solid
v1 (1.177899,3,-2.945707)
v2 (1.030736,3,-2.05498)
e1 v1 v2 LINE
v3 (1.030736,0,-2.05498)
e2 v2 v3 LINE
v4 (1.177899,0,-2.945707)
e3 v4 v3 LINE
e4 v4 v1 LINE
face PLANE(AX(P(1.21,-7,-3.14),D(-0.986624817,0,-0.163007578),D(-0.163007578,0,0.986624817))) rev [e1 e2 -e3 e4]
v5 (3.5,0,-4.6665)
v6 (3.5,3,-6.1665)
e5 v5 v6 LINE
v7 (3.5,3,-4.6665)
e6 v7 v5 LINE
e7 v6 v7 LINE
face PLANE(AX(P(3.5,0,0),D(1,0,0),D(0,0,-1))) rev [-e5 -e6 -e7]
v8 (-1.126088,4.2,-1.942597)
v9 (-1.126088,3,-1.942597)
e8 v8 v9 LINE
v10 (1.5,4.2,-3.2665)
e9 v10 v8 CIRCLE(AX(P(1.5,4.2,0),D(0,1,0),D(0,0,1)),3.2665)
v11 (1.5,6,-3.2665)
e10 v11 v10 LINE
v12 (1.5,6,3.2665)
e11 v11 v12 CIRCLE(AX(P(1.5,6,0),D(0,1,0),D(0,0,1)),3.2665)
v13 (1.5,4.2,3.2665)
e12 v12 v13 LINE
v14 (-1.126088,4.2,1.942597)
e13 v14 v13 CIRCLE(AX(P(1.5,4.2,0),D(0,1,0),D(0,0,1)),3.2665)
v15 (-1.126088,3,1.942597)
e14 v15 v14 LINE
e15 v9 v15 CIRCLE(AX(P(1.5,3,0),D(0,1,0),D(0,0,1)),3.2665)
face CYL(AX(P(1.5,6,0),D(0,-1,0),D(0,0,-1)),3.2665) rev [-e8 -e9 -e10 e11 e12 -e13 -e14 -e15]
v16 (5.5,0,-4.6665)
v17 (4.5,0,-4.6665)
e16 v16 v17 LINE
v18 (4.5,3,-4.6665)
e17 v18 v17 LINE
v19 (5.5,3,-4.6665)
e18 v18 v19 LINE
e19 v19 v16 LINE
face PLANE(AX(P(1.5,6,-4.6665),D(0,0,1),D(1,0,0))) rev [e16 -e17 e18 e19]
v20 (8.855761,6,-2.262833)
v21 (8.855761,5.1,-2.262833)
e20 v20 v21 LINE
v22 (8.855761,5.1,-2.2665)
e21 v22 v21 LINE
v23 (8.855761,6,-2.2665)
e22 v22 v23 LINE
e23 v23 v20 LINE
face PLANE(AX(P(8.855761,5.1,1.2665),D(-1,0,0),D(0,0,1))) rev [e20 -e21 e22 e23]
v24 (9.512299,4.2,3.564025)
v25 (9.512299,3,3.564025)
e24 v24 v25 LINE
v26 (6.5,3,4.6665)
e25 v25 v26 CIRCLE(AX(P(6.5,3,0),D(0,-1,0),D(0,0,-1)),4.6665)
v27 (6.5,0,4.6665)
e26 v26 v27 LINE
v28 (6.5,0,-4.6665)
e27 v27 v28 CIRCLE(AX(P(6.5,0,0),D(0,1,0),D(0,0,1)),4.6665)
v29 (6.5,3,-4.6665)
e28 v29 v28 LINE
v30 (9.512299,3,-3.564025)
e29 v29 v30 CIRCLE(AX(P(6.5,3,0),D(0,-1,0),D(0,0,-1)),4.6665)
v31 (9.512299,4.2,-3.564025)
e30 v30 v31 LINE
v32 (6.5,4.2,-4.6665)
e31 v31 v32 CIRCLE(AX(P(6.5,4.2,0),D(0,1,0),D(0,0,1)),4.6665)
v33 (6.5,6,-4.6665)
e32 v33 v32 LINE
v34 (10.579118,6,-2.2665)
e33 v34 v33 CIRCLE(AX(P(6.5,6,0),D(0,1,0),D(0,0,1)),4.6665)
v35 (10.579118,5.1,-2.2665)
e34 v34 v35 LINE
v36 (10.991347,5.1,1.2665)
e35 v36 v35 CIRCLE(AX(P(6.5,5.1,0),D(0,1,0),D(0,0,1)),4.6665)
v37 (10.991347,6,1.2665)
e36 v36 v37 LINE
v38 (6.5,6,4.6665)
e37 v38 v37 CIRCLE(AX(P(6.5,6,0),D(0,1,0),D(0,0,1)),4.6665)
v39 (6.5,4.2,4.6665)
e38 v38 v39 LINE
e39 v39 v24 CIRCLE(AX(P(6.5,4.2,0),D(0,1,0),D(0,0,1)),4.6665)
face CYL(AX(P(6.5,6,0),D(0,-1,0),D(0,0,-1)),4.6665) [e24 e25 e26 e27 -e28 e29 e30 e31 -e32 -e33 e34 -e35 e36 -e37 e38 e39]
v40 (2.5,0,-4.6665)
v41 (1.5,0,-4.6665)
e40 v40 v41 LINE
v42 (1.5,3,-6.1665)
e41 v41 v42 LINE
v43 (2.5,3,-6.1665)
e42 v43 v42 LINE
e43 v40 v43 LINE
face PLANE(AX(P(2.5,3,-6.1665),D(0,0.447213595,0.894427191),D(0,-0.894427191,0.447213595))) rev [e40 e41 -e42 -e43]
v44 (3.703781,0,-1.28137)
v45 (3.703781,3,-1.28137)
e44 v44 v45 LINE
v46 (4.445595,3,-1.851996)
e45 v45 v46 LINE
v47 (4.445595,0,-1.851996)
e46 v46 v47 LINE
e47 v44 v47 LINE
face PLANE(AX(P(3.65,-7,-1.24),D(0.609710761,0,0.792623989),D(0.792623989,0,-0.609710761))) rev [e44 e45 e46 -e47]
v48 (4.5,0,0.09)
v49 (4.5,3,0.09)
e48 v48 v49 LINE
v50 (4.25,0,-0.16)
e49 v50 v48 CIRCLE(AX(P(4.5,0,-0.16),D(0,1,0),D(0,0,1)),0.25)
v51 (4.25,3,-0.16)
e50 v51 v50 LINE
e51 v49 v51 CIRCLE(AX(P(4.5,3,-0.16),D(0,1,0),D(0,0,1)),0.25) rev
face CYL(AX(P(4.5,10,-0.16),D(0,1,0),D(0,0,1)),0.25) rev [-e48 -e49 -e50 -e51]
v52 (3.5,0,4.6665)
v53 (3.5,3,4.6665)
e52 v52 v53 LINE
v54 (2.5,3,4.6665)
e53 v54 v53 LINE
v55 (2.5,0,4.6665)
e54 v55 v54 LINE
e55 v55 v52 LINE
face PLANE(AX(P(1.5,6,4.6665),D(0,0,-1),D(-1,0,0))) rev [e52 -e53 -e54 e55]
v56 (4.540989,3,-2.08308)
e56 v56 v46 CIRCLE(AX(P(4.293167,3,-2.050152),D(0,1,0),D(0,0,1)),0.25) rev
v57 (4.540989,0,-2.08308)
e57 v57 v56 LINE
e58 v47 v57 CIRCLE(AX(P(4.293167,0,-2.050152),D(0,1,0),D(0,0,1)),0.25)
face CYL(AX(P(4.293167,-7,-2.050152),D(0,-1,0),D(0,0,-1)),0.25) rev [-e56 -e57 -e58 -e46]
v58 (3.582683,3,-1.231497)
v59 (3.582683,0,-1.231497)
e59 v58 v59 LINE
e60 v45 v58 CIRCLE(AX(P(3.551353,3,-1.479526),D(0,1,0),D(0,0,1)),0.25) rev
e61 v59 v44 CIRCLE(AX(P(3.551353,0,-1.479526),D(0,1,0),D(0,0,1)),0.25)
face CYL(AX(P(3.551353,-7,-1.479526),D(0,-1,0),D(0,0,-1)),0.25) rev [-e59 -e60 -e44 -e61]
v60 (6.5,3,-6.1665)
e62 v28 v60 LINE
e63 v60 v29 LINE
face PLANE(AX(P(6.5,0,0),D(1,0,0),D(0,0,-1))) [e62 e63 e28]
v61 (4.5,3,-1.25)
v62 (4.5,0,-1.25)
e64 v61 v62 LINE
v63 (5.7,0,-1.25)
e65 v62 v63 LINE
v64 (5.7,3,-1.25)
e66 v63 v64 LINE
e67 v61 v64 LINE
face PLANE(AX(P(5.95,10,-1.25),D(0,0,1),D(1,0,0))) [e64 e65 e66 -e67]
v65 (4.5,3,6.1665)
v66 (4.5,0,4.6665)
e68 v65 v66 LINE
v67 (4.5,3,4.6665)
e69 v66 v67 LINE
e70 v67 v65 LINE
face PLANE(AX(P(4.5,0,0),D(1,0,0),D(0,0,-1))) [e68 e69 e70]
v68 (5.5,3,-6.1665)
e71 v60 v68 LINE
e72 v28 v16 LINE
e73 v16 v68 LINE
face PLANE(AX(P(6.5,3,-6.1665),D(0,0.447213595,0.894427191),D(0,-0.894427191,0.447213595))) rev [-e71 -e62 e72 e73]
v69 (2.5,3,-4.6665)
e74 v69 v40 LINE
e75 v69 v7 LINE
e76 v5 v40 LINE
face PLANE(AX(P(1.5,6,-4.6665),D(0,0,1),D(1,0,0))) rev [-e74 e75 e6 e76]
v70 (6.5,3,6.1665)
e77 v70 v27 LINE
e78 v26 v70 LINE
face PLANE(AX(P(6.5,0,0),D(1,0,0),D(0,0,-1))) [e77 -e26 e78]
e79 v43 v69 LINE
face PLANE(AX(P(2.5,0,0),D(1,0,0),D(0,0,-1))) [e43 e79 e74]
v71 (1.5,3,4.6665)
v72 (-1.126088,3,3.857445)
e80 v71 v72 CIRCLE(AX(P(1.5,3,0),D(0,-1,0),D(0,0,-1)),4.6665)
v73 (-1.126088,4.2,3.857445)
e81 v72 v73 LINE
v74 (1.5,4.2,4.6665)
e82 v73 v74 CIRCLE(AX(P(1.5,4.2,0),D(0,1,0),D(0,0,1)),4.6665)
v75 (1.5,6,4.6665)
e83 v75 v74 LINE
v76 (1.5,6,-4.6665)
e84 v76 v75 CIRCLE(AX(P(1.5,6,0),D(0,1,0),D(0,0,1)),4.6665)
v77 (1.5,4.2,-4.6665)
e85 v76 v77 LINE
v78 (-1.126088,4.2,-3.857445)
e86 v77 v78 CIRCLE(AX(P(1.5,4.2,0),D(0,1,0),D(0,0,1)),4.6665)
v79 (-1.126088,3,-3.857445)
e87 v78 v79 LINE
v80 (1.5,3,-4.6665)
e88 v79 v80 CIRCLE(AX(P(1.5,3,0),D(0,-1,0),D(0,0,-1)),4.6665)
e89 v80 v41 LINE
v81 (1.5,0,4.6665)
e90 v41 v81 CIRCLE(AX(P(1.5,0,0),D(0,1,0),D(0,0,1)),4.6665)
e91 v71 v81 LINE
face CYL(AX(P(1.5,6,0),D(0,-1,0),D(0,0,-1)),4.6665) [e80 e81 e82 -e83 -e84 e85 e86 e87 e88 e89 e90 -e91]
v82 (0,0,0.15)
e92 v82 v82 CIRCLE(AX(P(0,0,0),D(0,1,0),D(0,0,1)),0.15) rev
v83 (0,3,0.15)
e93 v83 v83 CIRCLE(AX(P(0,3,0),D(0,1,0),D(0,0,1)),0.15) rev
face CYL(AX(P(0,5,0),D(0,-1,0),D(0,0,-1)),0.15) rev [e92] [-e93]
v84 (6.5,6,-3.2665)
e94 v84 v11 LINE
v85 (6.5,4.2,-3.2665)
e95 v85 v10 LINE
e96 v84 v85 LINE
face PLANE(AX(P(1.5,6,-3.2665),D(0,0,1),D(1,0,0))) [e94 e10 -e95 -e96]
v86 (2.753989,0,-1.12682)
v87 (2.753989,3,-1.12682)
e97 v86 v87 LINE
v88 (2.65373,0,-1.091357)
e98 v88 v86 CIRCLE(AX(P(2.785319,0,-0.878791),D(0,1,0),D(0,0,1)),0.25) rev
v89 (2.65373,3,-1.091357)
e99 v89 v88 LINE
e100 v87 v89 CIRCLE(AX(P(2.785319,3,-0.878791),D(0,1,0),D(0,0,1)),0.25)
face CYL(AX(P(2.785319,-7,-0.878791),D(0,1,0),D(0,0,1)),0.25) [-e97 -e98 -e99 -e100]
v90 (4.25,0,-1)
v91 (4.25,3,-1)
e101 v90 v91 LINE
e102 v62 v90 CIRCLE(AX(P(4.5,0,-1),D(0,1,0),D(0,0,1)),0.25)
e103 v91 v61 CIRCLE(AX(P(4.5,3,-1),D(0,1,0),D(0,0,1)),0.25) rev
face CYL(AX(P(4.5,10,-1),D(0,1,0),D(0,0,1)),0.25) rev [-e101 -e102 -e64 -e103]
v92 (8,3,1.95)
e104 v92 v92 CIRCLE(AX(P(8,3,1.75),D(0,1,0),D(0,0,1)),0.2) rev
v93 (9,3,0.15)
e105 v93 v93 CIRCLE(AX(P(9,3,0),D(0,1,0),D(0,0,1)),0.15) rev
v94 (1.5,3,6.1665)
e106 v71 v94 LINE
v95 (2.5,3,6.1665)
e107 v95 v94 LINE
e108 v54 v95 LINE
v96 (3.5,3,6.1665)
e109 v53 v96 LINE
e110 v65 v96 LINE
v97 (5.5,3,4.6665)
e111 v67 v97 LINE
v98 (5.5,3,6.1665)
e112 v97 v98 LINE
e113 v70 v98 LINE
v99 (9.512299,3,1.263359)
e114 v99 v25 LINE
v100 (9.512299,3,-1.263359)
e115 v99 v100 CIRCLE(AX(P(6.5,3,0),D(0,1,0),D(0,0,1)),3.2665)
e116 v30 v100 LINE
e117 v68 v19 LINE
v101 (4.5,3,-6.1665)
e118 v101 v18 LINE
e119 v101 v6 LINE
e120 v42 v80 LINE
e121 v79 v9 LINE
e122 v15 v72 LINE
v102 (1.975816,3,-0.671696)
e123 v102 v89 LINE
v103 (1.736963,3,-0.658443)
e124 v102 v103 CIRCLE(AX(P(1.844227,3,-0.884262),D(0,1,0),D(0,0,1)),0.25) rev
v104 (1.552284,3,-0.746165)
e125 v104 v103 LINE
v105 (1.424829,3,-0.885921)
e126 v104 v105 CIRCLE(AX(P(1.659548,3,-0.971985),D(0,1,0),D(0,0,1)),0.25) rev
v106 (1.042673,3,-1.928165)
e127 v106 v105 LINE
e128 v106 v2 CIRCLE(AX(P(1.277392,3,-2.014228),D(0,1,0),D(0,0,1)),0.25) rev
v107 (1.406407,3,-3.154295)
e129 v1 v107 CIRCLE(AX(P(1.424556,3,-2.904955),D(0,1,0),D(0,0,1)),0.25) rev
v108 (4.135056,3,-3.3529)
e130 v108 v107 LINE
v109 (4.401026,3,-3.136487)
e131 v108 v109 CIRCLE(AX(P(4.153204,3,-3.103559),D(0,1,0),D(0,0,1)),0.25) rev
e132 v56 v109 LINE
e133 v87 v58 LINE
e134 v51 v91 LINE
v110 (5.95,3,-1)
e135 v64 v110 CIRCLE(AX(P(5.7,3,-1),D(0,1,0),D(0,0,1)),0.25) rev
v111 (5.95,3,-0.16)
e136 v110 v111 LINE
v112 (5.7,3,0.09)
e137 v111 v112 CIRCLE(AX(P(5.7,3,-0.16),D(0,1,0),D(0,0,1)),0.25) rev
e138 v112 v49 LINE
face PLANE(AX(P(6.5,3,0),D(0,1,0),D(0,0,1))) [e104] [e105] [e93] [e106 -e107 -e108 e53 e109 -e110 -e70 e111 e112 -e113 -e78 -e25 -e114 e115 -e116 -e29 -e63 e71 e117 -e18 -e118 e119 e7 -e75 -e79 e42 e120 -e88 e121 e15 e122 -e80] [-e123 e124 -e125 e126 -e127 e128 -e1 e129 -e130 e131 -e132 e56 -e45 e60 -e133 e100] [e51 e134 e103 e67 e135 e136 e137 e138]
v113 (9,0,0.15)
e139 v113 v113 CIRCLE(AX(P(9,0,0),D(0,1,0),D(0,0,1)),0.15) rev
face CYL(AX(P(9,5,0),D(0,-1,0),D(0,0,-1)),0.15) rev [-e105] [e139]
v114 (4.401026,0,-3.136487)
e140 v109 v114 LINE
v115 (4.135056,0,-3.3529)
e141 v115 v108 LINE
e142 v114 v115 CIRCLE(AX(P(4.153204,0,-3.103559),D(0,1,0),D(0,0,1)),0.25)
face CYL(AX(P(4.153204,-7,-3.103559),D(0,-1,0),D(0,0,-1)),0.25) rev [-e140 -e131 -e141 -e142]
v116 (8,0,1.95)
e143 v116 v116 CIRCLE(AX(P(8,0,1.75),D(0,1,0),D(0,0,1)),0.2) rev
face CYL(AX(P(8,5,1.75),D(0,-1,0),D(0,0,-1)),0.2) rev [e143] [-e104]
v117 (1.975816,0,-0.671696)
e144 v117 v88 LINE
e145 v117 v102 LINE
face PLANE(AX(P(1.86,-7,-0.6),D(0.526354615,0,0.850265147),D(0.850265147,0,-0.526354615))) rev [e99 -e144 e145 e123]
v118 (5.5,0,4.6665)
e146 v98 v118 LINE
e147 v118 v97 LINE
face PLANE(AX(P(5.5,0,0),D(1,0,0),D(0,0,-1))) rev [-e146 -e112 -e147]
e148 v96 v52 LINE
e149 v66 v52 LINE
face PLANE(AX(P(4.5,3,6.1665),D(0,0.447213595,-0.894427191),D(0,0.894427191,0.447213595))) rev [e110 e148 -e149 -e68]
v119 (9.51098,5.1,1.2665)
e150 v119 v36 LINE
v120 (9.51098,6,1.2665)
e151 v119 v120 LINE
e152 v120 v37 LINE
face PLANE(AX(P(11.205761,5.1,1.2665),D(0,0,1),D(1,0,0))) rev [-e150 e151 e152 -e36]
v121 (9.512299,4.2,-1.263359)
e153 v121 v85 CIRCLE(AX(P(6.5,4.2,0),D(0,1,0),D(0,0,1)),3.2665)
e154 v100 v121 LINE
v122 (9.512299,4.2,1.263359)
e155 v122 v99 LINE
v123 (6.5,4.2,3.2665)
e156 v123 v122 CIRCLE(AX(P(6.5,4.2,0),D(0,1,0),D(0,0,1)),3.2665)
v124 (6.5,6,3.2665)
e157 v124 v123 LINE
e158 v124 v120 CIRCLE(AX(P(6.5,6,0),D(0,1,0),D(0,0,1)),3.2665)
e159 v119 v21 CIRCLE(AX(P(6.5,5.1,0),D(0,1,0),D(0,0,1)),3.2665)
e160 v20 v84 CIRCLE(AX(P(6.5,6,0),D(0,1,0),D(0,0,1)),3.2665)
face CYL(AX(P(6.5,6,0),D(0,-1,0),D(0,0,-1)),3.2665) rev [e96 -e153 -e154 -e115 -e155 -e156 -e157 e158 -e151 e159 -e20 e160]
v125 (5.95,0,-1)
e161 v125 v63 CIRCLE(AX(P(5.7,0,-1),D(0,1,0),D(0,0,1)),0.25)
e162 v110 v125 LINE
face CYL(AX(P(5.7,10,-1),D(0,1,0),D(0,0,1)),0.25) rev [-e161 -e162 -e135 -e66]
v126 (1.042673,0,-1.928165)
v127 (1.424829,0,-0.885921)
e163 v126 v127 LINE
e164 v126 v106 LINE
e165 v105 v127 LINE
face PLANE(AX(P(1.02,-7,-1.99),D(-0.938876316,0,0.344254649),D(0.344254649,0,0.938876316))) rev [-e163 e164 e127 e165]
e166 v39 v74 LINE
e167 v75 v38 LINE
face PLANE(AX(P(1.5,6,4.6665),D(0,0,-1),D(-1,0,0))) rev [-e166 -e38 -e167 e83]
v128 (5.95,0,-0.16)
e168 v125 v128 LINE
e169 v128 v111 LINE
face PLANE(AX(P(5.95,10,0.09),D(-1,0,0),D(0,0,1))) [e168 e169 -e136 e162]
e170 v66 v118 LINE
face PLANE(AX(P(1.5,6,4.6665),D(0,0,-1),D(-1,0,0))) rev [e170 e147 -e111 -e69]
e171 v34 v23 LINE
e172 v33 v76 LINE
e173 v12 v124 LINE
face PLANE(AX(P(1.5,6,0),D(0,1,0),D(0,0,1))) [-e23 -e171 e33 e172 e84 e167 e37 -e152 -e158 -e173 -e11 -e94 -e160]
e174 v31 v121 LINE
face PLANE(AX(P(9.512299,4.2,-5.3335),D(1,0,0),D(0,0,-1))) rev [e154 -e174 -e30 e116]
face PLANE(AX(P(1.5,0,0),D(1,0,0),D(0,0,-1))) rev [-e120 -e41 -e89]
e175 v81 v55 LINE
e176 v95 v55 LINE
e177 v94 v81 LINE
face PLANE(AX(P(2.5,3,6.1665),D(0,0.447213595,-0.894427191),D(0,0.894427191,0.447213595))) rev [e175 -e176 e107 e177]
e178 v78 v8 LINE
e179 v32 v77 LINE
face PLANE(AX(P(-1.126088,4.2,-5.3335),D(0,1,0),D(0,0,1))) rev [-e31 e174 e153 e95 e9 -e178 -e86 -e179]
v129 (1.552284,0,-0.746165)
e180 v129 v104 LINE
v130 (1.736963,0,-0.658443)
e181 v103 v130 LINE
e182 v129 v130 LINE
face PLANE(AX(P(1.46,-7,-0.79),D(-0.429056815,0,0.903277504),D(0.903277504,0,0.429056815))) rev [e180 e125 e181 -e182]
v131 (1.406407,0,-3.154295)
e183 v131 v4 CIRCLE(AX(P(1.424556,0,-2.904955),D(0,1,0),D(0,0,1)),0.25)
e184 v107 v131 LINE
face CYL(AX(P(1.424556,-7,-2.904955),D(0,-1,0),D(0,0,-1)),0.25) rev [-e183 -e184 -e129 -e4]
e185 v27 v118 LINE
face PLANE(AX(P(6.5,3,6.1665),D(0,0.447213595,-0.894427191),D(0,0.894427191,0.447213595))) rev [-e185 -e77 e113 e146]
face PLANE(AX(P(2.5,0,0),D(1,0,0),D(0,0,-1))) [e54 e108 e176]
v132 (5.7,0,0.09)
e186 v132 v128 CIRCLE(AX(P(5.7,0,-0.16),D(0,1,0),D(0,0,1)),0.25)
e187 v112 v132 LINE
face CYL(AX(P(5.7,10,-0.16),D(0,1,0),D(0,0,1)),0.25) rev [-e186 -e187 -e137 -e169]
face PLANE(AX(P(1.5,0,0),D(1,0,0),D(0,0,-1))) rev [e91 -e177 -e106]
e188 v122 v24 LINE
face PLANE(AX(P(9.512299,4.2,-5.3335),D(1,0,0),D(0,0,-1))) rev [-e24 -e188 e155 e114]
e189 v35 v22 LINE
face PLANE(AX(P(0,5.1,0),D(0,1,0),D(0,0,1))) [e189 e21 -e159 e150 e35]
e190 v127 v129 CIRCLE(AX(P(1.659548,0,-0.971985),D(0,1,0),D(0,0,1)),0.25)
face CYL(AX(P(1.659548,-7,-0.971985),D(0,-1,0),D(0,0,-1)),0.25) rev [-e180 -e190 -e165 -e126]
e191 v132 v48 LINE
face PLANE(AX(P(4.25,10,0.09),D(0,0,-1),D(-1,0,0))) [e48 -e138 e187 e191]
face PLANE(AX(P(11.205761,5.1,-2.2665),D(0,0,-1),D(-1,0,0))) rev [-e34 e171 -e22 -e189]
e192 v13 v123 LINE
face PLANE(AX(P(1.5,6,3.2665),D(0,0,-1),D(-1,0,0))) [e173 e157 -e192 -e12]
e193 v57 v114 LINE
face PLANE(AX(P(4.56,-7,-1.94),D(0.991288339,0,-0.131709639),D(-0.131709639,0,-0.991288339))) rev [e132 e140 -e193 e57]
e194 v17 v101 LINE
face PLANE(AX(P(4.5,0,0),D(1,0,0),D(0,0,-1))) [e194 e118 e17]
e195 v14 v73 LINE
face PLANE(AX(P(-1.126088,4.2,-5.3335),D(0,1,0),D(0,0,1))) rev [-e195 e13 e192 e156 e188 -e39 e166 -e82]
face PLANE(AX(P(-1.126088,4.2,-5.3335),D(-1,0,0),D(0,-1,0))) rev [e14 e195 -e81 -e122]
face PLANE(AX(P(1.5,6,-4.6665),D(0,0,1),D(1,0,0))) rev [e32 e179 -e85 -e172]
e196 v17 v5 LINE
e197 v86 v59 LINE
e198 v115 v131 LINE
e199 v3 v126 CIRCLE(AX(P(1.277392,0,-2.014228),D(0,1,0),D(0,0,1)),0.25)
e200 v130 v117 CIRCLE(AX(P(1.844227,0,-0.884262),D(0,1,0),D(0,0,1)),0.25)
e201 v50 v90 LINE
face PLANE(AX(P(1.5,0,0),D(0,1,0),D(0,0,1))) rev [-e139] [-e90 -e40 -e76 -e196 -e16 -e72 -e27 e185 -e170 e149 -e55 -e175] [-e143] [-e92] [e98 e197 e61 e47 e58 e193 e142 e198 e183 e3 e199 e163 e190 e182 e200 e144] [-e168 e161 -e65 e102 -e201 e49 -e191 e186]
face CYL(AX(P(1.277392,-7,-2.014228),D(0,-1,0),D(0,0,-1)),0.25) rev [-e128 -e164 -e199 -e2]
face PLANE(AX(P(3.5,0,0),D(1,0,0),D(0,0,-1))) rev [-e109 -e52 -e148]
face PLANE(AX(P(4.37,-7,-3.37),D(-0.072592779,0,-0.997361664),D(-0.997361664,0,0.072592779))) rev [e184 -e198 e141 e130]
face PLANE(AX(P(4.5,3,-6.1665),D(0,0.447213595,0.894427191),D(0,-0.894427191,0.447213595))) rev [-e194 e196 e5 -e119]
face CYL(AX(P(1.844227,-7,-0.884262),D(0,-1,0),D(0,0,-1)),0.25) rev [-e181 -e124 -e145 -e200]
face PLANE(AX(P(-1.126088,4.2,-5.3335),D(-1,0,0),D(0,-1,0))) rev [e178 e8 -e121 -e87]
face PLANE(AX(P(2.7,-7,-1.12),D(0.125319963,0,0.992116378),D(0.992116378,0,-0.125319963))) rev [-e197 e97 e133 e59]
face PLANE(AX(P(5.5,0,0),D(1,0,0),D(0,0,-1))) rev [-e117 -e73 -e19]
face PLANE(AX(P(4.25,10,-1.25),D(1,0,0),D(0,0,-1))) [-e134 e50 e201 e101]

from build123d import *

# Parameters (mm, degrees)
LIP_DEPTH                    = 6
BASE_DEPTH                   = 3
LAMDABREGMAGUIDES_DEPTH      = 5
LAMDABREGMAGUIDES_DEPTH_BACK = 5
SKETCH16_R                   = 0.15
SKETCH16_R_2                 = 0.2
SKETCH3_W                    = 10.638387248
SKETCH3_H                    = 1.2
CUT4ACRYLIC_DEPTH            = 10
SKETCH4_W                    = 2.35
SKETCH4_H                    = 3.533
CUTFORGROUNDPIN_DEPTH        = 0.9
BOSS_EXTRUDE6_DEPTH          = 1
CRVPATTERN1_START            = 3.5
CRVPATTERN1_DEPTH            = 1
CRVPATTERN1_START_2          = 5.5
CRVPATTERN1_2_DEPTH          = 1
BOSS_EXTRUDE7_DEPTH          = 1
CRVPATTERN5_START            = 3.5
CRVPATTERN5_DEPTH            = 1
CRVPATTERN5_START_2          = 5.5
CRVPATTERN5_2_DEPTH          = 1
CUT_EXTRUDE1_DEPTH           = 10
CUT_EXTRUDE3_DEPTH           = 10
CUT_EXTRUDE3_DEPTH_BACK      = 10
SKETCH32_W                   = 1.7
SKETCH32_H                   = 1.34
FILLET1_R                    = 0.25


# Read off the part's stored shape, not the designer's step: Lip, CrvPattern1, CrvPattern5
with BuildPart() as part:
    # Lip outline → Lip (new body)
    with BuildSketch(Plane(origin=(0, 0, 0), x_dir=(1, 0, 0), z_dir=(0, 1, 0))):
        with BuildLine():
            ThreePointArc((1.5, 4.6665), (-3.1665, 0), (1.5, -4.6665))
            Line((1.5, -4.6665), (6.5, -4.6665))
            ThreePointArc((6.5, -4.6665), (11.1665, 0), (6.5, 4.6665))
            Line((6.5, 4.6665), (1.5, 4.6665))
        make_face()
        with BuildLine():
            Line((6.5, -3.2665), (1.5, -3.2665))
            ThreePointArc((1.5, -3.2665), (-1.7665, 0), (1.5, 3.2665))
            Line((1.5, 3.2665), (6.5, 3.2665))
            ThreePointArc((6.5, 3.2665), (9.7665, 0), (6.5, -3.2665))
        make_face(mode=Mode.SUBTRACT)
    extrude(amount=LIP_DEPTH)

    # Sketch2 → Base (add)
    with BuildSketch(Plane(origin=(0, 0, 0), x_dir=(1, 0, 0), z_dir=(0, 1, 0))):
        with BuildLine():
            Line((6.5, -3.2665), (1.5, -3.2665))
            ThreePointArc((1.5, -3.2665), (-1.7665, 0), (1.5, 3.2665))
            Line((1.5, 3.2665), (6.5, 3.2665))
            ThreePointArc((6.5, 3.2665), (9.7665, 0), (6.5, -3.2665))
        make_face()
    extrude(amount=BASE_DEPTH)

    # Sketch16 → LamdaBregmaGuides (cut, two sides: drawn at the far end of the back side and taken through both)
    with BuildSketch(Plane(origin=(0, 0, 0), x_dir=(1, 0, 0), z_dir=(0, 1, 0)).offset(-LAMDABREGMAGUIDES_DEPTH_BACK)):
        with Locations(Location((0, 0, 0), (0, 0, 270))):
            Circle(SKETCH16_R)
        with Locations(Location((9, 0, 0), (0, 0, 270))):
            Circle(SKETCH16_R)
        with Locations(Location((8, -1.75, 0), (0, 0, 270))):
            Circle(SKETCH16_R_2)
    extrude(amount=LAMDABREGMAGUIDES_DEPTH + LAMDABREGMAGUIDES_DEPTH_BACK, mode=Mode.SUBTRACT)

    # Sketch3 → Cut4Acrylic (cut)
    with BuildSketch(Plane.XY.offset(4.6665)):
        with Locations((4.193105486, 3.6)):
            Rectangle(SKETCH3_W, SKETCH3_H)
    extrude(amount=-CUT4ACRYLIC_DEPTH, mode=Mode.SUBTRACT)

    # Sketch4 → CutforGroundPin (cut)
    with BuildSketch(Plane(origin=(0, 6, 0), x_dir=(1, 0, 0), z_dir=(0, 1, 0))):
        with Locations((10.030760676, 0.5)):
            Rectangle(SKETCH4_W, SKETCH4_H)
    extrude(amount=-CUTFORGROUNDPIN_DEPTH, mode=Mode.SUBTRACT)

    # Sketch21 → Boss-Extrude6 (add)
    with BuildSketch(Plane(origin=(1.5, 0, 0), x_dir=(0, 0, -1), z_dir=(1, 0, 0))):
        Polygon((-4.6665, 3), (-6.1665, 3), (-4.6665, 0), align=None)
    extrude(amount=BOSS_EXTRUDE6_DEPTH)

    # CrvPattern1 outline → CrvPattern1 (add)
    with BuildSketch(Plane.YZ.offset(CRVPATTERN1_START)):
        Polygon((0, 4.6665), (3, 4.6665), (3, 6.1665), align=None)
    extrude(amount=CRVPATTERN1_DEPTH)

    # CrvPattern1 2 outline → CrvPattern1 2 (add)
    with BuildSketch(Plane.YZ.offset(CRVPATTERN1_START_2)):
        Polygon((0, 4.6665), (3, 4.6665), (3, 6.1665), align=None)
    extrude(amount=CRVPATTERN1_2_DEPTH)

    # Sketch22 → Boss-Extrude7 (add)
    with BuildSketch(Plane(origin=(1.5, 0, 0), x_dir=(0, 0, -1), z_dir=(1, 0, 0))):
        Polygon((4.6665, 0), (4.6665, 3), (6.1665, 3), align=None)
    extrude(amount=BOSS_EXTRUDE7_DEPTH)

    # CrvPattern5 outline → CrvPattern5 (add)
    with BuildSketch(Plane.YZ.offset(CRVPATTERN5_START)):
        Polygon((0, -4.6665), (3, -6.1665), (3, -4.6665), align=None)
    extrude(amount=CRVPATTERN5_DEPTH)

    # CrvPattern5 2 outline → CrvPattern5 2 (add)
    with BuildSketch(Plane.YZ.offset(CRVPATTERN5_START_2)):
        Polygon((0, -4.6665), (3, -6.1665), (3, -4.6665), align=None)
    extrude(amount=CRVPATTERN5_2_DEPTH)

    # Sketch31 → Cut-Extrude1 (cut)
    with BuildSketch(Plane(origin=(0, 3, 0), x_dir=(1, 0, 0), z_dir=(0, 1, 0))):
        Polygon((1.21, 3.14), (1.02, 1.99), (1.46, 0.79), (1.86, 0.6), (2.7, 1.12), (3.65, 1.24), (4.56, 1.94), (4.37, 3.37), align=None)
    extrude(amount=-CUT_EXTRUDE1_DEPTH, mode=Mode.SUBTRACT)

    # Sketch32 → Cut-Extrude3 (cut, two sides: drawn at the far end of the back side and taken through both)
    with BuildSketch(Plane(origin=(0, 0, 0), x_dir=(1, 0, 0), z_dir=(0, 1, 0)).offset(-CUT_EXTRUDE3_DEPTH_BACK)):
        with Locations((5.1, 0.58)):
            Rectangle(SKETCH32_W, SKETCH32_H)
    extrude(amount=CUT_EXTRUDE3_DEPTH + CUT_EXTRUDE3_DEPTH_BACK, mode=Mode.SUBTRACT)

    # Fillet1
    fillet1_edges = [part.edges().sort_by_distance(p)[0] for p in [
        (1.21, 1.5, -3.14),
        (4.37, 1.5, -3.37),
        (4.56, 1.5, -1.94),
        (3.65, 1.5, -1.24),
        (2.7, 1.5, -1.12),
        (1.86, 1.5, -0.6),
        (1.46, 1.5, -0.79),
        (1.02, 1.5, -1.99),
        (5.95, 1.5, 0.09),
        (5.95, 1.5, -1.25),
        (4.25, 1.5, -1.25),
        (4.25, 1.5, 0.09),
    ]]
    fillet(fillet1_edges, radius=FILLET1_R)


solid = part.part
